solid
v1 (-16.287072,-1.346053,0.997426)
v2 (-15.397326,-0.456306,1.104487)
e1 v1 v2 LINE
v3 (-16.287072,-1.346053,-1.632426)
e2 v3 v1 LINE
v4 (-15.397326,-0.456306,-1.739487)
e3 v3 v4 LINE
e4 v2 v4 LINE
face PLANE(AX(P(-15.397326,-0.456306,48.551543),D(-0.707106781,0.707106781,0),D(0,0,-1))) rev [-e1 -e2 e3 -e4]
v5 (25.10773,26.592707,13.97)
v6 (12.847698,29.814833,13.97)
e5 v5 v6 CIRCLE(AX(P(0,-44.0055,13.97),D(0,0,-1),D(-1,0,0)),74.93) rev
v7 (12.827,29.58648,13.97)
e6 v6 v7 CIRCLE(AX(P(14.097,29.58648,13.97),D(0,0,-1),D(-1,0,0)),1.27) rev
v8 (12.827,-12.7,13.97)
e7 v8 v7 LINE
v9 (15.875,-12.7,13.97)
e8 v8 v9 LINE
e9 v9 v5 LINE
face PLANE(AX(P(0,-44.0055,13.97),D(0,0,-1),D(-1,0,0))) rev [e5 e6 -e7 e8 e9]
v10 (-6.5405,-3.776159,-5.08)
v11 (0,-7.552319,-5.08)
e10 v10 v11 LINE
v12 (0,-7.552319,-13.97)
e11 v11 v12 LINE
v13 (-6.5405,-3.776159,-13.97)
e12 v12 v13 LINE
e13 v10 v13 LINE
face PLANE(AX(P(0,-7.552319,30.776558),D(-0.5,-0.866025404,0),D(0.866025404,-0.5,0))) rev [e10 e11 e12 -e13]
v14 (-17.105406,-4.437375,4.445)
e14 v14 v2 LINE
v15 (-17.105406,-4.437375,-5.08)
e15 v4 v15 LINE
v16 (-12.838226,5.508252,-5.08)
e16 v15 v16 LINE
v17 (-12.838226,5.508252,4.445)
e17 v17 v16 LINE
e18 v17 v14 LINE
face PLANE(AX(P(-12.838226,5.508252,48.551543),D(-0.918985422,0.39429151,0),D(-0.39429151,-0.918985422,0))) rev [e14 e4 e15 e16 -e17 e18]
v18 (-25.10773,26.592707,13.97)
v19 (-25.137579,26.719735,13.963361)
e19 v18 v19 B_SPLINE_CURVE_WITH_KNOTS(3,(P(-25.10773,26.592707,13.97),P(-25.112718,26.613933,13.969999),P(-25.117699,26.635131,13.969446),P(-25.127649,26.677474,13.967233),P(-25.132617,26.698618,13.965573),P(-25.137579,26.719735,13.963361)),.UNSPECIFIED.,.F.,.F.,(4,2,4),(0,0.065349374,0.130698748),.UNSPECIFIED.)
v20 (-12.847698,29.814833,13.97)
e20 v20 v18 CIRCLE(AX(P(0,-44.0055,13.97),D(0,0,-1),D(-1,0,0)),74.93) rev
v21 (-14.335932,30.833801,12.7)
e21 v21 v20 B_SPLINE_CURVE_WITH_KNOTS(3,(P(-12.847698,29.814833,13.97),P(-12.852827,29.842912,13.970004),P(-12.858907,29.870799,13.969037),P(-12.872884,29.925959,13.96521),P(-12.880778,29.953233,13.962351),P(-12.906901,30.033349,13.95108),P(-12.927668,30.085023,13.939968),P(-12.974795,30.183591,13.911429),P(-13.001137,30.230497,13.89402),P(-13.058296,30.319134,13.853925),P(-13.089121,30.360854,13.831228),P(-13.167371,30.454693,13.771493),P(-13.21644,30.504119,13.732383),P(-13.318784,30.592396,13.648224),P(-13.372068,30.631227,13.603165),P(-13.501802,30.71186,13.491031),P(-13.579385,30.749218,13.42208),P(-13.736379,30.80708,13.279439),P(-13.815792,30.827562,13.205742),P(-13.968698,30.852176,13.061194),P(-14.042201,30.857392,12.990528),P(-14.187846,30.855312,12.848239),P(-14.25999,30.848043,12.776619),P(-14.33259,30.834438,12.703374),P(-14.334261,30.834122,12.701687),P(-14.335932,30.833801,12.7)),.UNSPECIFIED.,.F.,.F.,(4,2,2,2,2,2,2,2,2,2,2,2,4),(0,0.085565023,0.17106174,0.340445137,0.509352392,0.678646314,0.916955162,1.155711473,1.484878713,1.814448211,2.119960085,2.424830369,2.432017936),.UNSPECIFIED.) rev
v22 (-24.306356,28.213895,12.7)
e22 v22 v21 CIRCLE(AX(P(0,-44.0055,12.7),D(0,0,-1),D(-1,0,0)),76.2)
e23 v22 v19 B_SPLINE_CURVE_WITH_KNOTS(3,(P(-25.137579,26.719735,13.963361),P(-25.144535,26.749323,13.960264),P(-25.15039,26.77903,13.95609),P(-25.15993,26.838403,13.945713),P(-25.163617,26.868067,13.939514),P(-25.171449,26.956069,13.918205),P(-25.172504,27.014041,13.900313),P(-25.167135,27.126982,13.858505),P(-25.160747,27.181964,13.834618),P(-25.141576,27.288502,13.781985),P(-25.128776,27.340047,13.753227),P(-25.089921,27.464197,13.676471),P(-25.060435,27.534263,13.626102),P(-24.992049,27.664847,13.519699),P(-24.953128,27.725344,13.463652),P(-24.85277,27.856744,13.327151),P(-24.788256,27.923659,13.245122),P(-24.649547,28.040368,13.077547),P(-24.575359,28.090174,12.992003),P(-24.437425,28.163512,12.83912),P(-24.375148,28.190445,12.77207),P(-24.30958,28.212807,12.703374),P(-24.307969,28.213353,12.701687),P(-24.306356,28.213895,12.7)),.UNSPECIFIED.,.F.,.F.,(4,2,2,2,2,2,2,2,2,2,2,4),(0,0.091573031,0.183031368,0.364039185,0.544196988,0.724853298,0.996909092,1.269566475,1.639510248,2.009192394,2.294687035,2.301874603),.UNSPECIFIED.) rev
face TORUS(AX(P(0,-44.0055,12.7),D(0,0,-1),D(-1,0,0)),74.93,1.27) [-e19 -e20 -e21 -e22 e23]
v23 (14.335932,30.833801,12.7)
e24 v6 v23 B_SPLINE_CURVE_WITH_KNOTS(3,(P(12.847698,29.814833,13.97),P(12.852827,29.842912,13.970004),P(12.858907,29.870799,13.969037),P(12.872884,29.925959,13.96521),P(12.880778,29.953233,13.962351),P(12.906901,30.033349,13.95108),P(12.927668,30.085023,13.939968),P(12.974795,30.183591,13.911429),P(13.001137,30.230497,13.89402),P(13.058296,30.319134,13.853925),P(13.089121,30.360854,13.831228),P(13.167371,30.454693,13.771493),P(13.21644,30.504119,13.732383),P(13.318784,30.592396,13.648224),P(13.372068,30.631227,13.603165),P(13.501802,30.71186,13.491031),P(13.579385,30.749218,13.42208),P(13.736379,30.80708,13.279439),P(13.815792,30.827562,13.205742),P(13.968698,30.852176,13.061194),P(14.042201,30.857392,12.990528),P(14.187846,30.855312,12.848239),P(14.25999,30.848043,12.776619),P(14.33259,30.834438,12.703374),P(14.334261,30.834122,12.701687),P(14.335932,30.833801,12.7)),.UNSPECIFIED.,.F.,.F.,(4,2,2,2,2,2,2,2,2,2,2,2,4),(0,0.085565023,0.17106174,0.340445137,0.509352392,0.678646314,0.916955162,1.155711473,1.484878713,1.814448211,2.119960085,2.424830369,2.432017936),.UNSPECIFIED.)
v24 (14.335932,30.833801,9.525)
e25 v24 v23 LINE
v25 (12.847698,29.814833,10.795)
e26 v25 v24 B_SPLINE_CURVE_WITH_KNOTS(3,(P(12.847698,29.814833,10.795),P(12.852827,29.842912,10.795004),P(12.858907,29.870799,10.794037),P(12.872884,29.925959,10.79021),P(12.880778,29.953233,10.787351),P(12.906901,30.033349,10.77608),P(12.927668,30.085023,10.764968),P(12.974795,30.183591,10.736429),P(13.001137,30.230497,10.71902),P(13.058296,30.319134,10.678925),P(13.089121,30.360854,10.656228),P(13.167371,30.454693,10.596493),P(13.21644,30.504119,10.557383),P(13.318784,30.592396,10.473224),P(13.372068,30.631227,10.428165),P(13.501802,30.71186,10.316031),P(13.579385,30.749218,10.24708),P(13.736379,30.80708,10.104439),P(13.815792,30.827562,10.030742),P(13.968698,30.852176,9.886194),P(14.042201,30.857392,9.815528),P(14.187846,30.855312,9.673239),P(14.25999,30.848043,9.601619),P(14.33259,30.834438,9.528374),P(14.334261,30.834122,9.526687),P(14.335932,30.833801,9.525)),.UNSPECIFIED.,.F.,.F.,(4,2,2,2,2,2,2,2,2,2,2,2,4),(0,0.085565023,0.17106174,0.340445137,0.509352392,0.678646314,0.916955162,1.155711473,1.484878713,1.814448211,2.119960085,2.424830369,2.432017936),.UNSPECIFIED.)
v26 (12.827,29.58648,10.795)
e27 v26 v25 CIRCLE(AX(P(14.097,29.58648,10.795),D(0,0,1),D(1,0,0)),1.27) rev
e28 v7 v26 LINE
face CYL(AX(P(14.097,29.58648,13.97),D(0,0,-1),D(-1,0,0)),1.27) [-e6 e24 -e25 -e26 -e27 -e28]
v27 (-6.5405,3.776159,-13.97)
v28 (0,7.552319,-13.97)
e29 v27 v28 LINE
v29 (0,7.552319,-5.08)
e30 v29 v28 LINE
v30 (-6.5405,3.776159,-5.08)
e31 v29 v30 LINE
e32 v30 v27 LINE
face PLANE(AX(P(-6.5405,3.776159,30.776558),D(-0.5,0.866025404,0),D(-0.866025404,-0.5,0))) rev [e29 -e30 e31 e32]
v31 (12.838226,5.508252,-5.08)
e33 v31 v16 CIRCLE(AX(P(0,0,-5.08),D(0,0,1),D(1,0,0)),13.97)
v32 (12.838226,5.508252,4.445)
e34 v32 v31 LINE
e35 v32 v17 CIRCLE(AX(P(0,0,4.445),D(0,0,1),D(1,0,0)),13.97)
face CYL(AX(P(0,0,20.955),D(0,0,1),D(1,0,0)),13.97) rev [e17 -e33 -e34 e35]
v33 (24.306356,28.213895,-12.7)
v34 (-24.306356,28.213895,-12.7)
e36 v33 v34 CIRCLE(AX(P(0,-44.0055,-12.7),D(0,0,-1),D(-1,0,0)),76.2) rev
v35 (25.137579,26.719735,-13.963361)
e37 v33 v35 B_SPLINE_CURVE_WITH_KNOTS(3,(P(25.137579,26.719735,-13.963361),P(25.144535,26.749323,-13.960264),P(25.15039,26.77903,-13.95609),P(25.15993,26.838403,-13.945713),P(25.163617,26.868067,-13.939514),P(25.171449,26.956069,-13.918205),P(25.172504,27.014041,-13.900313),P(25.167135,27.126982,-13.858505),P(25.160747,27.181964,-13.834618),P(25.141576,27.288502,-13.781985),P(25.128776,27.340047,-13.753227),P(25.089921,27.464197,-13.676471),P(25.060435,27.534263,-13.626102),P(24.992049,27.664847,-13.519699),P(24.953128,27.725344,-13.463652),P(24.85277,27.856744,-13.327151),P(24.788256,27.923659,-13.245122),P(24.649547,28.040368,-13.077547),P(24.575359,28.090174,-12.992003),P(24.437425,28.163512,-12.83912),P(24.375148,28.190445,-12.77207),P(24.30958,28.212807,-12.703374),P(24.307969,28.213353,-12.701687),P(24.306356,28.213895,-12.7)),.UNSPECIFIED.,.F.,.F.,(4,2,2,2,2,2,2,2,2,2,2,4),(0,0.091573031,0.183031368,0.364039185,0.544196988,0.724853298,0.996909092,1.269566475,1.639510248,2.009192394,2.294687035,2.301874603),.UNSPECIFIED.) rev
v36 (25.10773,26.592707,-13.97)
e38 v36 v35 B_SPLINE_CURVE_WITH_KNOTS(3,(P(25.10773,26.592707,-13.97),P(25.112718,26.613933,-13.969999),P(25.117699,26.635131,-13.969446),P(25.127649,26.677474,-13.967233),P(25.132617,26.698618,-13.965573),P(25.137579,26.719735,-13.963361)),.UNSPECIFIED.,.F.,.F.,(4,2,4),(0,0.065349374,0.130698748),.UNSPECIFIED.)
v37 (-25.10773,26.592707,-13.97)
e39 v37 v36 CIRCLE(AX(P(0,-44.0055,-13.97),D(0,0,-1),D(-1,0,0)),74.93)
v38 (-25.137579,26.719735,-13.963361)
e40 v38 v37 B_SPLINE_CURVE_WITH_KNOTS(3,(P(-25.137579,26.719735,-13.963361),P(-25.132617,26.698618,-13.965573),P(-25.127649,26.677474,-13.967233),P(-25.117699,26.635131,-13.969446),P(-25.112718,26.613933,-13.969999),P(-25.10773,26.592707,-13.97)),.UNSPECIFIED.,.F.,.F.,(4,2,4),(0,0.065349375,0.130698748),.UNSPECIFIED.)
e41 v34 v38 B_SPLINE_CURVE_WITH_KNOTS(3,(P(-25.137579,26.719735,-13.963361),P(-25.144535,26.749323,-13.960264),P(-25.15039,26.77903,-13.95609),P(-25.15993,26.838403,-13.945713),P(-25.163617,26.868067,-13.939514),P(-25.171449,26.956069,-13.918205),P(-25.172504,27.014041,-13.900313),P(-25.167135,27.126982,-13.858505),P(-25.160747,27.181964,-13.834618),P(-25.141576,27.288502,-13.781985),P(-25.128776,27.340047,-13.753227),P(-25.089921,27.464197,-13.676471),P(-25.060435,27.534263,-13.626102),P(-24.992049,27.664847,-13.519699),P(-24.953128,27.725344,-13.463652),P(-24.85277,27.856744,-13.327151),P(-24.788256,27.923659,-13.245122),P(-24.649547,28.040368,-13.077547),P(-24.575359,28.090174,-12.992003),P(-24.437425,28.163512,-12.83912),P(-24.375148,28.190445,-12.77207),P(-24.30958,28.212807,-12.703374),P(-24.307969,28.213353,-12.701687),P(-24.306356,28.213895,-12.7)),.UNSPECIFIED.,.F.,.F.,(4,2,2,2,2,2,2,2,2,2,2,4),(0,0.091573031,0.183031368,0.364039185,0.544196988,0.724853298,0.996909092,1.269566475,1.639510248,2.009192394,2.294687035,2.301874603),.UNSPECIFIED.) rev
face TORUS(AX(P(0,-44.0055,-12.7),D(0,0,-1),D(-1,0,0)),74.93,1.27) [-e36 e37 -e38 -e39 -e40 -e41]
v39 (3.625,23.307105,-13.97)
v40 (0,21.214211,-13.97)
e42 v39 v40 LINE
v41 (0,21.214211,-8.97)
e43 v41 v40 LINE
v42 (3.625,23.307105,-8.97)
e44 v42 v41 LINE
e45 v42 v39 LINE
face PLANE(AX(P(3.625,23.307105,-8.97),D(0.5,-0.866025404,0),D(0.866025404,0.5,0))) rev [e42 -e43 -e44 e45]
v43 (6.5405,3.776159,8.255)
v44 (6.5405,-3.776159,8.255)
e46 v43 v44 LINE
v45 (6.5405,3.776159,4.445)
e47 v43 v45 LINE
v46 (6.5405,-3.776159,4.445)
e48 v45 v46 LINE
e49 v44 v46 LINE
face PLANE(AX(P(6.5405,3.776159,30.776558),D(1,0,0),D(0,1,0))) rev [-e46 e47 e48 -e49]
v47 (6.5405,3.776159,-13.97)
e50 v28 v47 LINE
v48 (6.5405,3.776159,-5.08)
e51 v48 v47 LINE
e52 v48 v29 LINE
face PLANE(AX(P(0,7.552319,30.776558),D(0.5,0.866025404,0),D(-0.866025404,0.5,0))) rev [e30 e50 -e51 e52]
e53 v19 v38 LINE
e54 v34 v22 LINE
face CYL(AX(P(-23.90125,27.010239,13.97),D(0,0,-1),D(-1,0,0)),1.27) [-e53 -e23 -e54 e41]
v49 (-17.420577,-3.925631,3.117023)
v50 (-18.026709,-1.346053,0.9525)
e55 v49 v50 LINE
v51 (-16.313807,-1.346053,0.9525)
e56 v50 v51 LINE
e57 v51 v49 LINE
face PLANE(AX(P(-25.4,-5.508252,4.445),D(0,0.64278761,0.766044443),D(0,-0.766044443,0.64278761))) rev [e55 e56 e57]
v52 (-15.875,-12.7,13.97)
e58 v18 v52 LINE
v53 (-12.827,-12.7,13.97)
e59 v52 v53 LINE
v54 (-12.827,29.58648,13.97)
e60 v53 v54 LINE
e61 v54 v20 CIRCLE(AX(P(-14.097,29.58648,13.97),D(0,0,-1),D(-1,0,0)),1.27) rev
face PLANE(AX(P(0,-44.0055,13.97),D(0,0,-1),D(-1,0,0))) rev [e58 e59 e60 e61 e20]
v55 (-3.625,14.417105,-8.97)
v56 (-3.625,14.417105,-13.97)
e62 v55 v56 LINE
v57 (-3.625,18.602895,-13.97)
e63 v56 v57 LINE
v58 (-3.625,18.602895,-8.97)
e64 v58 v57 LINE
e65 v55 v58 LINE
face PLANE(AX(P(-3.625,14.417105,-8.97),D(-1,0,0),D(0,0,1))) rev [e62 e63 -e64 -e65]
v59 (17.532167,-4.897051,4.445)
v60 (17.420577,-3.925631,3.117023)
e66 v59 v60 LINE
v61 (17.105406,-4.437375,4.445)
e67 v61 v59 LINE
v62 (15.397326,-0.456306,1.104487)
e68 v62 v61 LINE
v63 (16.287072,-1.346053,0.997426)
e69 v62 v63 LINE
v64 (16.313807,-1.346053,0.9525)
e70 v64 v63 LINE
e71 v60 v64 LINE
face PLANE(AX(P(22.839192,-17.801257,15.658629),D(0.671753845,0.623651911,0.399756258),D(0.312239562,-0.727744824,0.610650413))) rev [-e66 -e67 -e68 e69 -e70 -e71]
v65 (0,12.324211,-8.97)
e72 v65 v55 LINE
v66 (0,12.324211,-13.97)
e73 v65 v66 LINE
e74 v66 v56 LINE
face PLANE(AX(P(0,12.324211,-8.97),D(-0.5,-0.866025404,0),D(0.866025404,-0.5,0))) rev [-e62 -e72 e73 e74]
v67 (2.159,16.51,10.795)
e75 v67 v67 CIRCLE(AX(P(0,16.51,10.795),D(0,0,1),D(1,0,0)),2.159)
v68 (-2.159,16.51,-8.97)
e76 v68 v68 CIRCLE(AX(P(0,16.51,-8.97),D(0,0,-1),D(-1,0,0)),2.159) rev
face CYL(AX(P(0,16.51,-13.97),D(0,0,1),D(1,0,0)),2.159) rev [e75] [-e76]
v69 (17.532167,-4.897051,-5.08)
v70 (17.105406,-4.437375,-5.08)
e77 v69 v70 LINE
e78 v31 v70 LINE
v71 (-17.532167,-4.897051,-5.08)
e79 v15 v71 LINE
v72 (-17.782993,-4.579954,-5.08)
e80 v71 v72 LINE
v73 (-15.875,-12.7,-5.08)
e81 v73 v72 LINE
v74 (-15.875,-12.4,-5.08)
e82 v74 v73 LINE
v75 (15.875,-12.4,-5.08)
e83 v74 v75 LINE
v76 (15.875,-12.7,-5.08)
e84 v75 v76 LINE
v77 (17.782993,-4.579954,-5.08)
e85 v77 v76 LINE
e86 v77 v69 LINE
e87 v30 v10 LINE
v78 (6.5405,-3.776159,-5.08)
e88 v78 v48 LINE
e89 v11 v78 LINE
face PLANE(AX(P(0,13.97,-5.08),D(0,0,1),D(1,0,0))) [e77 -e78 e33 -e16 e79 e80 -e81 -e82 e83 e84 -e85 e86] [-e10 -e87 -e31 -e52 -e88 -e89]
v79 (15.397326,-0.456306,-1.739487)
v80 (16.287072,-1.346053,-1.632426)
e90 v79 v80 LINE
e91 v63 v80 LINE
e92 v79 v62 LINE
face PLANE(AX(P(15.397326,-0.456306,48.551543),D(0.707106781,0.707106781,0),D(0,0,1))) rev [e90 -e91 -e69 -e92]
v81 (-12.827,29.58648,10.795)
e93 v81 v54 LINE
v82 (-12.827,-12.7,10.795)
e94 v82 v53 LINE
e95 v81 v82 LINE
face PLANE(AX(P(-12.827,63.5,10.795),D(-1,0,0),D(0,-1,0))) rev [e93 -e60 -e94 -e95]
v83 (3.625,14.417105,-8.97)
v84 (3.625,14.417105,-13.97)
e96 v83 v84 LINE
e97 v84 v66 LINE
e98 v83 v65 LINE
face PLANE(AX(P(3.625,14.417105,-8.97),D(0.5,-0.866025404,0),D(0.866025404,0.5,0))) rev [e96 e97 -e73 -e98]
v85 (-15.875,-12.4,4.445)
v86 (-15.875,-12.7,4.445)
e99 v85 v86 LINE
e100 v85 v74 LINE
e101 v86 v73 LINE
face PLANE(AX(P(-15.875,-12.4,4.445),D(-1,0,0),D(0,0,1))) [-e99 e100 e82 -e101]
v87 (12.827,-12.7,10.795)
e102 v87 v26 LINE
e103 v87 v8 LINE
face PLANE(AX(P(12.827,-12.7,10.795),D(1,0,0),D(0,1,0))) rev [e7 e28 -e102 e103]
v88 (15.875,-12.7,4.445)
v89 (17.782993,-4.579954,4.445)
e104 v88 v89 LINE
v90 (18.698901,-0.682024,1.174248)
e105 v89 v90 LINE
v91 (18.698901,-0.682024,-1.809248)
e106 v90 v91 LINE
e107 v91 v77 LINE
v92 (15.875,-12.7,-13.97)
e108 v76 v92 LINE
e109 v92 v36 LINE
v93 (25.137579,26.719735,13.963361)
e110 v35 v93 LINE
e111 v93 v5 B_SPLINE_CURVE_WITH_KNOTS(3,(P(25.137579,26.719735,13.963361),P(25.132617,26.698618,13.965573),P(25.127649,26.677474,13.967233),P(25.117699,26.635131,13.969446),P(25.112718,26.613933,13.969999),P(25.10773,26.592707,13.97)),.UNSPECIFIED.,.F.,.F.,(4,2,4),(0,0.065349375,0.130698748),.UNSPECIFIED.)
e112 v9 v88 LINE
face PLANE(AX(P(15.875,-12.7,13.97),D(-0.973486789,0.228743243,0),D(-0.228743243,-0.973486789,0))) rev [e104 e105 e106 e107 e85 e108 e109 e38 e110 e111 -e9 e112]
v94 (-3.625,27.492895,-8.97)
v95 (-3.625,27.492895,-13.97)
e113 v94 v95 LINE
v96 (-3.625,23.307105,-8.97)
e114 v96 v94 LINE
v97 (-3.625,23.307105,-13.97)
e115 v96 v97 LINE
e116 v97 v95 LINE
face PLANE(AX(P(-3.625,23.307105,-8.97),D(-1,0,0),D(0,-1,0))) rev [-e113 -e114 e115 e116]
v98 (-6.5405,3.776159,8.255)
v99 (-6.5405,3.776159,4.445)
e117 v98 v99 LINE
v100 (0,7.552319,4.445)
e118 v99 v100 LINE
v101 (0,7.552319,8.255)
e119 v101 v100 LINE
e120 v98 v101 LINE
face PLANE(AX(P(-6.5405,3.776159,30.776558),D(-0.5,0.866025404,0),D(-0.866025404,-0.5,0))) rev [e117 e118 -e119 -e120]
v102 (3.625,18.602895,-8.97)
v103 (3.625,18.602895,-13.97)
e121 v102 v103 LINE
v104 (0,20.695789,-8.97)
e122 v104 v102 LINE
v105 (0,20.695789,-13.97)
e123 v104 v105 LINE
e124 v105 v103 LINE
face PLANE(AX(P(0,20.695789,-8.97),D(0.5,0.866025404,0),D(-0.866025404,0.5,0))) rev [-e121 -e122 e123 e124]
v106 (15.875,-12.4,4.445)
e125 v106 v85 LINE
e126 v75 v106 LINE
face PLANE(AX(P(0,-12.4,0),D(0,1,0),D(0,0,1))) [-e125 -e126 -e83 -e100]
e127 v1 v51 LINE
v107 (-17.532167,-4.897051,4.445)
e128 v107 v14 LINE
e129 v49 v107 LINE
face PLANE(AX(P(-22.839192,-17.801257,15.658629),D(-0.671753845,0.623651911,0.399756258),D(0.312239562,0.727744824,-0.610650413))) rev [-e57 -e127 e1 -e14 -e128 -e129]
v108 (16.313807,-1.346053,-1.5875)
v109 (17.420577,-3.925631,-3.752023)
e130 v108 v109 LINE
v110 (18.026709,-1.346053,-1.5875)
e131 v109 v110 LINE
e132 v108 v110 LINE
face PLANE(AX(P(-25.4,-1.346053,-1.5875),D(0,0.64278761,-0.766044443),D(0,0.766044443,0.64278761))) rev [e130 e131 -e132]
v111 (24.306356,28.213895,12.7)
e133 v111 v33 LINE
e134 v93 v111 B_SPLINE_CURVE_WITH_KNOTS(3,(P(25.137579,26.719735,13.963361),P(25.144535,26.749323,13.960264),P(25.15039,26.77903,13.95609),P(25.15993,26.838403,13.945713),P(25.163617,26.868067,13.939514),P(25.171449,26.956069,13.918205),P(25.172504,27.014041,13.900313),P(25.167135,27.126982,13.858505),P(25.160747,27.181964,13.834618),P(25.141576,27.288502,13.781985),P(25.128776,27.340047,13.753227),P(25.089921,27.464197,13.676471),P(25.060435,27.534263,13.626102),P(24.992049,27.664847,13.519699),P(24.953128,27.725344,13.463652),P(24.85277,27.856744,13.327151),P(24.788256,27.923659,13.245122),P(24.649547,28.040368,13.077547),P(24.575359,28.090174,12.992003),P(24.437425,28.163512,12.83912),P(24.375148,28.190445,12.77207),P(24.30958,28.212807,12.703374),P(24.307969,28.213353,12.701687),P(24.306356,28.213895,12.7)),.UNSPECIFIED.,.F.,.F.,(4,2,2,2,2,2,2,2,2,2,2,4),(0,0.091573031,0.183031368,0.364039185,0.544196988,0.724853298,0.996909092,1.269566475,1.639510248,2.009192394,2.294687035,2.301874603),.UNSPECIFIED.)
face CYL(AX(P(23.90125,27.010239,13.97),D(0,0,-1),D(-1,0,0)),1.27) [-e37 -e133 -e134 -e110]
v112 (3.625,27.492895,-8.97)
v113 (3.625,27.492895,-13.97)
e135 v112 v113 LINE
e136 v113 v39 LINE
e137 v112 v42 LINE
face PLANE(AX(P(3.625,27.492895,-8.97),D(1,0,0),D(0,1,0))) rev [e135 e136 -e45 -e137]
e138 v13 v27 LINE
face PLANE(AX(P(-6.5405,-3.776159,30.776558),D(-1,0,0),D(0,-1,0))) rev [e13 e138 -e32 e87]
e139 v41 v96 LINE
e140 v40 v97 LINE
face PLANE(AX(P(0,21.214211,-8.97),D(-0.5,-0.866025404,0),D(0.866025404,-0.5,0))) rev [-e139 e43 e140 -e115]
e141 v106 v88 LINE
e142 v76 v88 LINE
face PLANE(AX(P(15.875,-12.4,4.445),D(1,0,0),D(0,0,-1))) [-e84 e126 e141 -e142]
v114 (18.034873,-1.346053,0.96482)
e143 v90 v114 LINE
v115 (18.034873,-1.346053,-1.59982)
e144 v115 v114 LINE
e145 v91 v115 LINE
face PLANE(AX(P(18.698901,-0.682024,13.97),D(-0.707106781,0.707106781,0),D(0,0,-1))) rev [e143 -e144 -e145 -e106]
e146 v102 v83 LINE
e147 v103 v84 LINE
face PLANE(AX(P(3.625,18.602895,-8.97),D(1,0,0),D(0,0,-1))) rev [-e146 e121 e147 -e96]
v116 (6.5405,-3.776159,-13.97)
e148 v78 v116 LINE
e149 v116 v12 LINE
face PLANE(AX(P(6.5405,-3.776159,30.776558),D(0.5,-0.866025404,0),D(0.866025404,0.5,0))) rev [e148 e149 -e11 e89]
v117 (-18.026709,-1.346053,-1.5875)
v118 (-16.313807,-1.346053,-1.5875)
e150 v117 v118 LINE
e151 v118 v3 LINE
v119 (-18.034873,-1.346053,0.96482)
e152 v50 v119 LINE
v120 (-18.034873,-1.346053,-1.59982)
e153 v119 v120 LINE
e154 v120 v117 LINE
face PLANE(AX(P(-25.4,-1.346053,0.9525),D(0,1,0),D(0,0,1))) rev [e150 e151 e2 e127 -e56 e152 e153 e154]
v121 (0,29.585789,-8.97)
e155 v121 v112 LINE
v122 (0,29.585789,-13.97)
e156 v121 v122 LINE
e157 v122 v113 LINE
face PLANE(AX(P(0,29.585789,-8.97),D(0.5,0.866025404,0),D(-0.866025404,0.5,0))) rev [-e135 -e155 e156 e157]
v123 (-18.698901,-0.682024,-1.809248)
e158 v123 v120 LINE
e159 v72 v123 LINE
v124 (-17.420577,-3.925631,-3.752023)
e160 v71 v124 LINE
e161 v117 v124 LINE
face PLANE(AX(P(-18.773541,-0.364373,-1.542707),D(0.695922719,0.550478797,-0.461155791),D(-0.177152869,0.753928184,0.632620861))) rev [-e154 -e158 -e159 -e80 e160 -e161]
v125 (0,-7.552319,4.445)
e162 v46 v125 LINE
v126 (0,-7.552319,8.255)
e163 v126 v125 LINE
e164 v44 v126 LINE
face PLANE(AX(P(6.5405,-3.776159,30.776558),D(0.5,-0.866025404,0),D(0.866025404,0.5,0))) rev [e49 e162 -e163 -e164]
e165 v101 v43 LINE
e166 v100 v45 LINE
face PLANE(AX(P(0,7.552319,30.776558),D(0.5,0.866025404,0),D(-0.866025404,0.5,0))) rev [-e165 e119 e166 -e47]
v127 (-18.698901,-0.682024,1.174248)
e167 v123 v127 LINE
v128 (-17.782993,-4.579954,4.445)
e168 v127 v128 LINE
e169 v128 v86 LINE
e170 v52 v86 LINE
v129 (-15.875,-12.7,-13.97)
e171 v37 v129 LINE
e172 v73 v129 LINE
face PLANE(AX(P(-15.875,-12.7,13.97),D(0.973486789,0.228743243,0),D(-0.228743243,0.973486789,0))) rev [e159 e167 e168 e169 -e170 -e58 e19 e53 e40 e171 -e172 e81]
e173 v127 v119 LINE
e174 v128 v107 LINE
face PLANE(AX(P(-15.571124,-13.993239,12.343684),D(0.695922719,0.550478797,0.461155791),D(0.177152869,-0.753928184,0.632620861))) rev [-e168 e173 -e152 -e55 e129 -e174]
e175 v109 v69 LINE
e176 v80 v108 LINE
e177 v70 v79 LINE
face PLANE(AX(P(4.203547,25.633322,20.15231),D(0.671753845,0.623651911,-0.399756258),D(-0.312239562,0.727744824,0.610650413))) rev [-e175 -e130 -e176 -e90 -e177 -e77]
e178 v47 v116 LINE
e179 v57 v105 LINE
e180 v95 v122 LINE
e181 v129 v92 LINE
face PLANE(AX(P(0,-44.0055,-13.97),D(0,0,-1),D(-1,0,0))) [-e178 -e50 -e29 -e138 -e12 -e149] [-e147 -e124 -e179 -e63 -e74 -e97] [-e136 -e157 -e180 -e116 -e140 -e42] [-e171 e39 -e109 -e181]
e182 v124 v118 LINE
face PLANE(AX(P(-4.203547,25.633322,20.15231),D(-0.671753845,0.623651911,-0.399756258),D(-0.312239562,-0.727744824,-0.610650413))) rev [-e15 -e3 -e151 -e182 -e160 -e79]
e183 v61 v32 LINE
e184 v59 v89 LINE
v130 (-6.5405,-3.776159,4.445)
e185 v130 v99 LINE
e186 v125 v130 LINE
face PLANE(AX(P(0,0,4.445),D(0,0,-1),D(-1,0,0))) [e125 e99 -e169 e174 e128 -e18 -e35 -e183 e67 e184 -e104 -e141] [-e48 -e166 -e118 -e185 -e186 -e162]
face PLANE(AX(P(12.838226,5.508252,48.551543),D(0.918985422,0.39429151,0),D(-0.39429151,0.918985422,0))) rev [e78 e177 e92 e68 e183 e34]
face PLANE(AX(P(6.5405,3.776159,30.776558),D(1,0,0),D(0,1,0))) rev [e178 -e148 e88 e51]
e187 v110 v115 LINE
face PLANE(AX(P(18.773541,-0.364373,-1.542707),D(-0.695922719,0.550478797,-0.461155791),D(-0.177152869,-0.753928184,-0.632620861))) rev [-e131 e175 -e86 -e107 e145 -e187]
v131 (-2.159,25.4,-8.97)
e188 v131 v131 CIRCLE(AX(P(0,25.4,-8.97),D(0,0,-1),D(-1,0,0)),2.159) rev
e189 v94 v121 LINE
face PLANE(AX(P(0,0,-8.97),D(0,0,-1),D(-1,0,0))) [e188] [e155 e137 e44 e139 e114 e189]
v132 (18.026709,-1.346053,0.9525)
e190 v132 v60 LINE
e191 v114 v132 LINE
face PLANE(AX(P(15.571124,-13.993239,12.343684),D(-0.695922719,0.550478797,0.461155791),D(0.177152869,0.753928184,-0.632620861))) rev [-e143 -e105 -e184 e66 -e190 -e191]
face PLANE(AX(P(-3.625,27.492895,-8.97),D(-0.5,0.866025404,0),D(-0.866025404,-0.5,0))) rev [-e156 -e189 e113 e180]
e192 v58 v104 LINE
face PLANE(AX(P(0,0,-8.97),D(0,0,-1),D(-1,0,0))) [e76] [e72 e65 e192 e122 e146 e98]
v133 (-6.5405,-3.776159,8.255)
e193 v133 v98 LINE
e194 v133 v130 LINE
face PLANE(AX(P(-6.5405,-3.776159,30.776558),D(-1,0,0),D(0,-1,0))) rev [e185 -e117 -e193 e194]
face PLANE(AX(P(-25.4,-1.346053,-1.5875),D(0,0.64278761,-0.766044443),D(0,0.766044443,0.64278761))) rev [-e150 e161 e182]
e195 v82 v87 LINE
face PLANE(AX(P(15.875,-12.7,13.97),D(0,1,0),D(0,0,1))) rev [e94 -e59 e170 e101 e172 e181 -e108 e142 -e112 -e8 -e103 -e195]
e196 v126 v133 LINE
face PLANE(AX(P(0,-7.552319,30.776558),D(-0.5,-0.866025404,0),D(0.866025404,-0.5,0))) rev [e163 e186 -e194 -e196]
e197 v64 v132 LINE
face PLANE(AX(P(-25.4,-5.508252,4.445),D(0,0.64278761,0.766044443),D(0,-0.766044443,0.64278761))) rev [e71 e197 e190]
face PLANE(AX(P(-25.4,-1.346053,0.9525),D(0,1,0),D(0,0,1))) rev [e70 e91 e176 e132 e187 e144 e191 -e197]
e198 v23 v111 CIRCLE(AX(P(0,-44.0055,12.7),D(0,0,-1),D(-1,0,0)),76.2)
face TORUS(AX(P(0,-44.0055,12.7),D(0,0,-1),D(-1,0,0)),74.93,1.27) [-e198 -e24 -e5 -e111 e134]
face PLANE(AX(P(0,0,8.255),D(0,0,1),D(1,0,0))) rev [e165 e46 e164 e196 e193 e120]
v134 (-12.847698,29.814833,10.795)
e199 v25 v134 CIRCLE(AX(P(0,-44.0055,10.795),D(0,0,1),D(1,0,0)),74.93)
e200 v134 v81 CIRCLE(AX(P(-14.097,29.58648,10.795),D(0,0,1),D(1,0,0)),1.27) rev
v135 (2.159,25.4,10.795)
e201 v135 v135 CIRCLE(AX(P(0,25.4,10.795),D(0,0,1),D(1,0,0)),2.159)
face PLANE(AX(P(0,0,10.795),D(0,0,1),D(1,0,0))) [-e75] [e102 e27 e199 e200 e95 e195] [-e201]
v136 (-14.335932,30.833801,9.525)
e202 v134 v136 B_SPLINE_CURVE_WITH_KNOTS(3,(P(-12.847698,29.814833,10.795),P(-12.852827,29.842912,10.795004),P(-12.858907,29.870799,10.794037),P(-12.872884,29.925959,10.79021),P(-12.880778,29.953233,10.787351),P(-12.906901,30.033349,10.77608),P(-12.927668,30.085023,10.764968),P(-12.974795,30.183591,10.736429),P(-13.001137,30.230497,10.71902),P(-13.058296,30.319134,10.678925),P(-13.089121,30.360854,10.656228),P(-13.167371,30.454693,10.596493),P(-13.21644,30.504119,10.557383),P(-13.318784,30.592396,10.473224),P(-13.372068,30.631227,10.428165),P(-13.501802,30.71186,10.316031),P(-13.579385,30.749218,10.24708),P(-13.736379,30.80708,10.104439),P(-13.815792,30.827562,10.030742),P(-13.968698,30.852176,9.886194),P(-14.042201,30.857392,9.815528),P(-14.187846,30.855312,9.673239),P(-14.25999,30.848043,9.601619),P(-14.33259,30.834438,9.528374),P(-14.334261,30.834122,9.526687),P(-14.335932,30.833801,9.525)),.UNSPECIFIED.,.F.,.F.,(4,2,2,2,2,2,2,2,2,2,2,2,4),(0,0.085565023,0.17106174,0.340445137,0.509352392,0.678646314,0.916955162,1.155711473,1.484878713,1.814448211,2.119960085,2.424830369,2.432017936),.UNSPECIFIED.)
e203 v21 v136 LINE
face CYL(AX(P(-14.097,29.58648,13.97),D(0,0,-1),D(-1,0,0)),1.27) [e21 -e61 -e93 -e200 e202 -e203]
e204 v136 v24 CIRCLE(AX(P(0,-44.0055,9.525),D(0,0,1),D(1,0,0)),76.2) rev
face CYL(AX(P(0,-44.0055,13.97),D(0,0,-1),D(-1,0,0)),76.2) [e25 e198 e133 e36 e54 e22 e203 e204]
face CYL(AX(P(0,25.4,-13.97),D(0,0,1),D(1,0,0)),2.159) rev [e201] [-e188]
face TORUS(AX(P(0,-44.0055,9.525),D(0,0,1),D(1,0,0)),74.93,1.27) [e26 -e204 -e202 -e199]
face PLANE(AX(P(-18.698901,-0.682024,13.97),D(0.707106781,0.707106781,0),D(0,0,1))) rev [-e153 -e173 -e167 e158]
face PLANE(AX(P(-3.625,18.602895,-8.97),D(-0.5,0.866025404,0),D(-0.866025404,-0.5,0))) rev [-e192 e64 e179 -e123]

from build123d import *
from OCP.BRepFilletAPI import BRepFilletAPI_MakeChamfer

# Parameters (mm, degrees)
BOSS_EXTRUDE1_DEPTH     = 13.97
SKETCH5_W               = 25.654
SKETCH5_H               = 76.2
CUT_EXTRUDE3_DEPTH      = 3.175
CUT_EXTRUDE5_DEPTH      = 48.905647425
CUT_EXTRUDE5_DEPTH_BACK = 48.905647425
SKETCH8_R               = 2.159
SKETCH6_W               = 9.525
SKETCH6_H               = 13.97
CUT_EXTRUDE4_DEPTH      = 9.525
CUT_EXTRUDE1_DEPTH      = 22.225
CUT_EXTRUDE6_DEPTH      = 5
CUT_EXTRUDE8_DEPTH      = 44.32212749
CUT_EXTRUDE8_DEPTH_BACK = 44.32212749
CHAMFER1_SIZE           = 0.682114001
CHAMFER1_SIZE_2         = 0.508
CHAMFER1_SIZE_3         = 0.603255048
CHAMFER2_SIZE           = 0.508
CHAMFER2_SIZE2          = 0.71158035
CHAMFER2_SIZE2_2        = 0.968183523
FILLET2_R               = 1.27
SKETCH11_W              = 31.75
SKETCH11_H              = 9.525
BOSS_EXTRUDE3_DEPTH     = 0.3


with BuildPart() as part:
    # Sketch1 → Boss-Extrude1 (new, symmetric)
    with BuildSketch(Plane.XY):
        with BuildLine():
            Line((-15.875, -12.7), (-25.4, 27.836548969))
            ThreePointArc((-25.4, 27.836548969), (0, 32.1945), (25.4, 27.836548969))
            Line((25.4, 27.836548969), (15.875, -12.7))
            Line((15.875, -12.7), (-15.875, -12.7))
        make_face()
    extrude(amount=BOSS_EXTRUDE1_DEPTH, both=True)

    # Sketch5 → Cut-Extrude3 (cut)
    with BuildSketch(Plane.XY.offset(13.97)):
        with Locations((0, 25.4)):
            Rectangle(SKETCH5_W, SKETCH5_H)
    extrude(amount=-CUT_EXTRUDE3_DEPTH, mode=Mode.SUBTRACT)

    # Sketch8 → Cut-Extrude5 (cut, two sides: drawn at the far end of the back side and taken through both)
    with BuildSketch(Plane.XY.offset(10.795).offset(-CUT_EXTRUDE5_DEPTH_BACK)):
        with Locations((0, 16.51)):
            Circle(SKETCH8_R)
        with Locations((0, 25.4)):
            Circle(SKETCH8_R)
    extrude(amount=CUT_EXTRUDE5_DEPTH + CUT_EXTRUDE5_DEPTH_BACK, mode=Mode.SUBTRACT)

    # Sketch6 → Cut-Revolve2 (revolve, cut)
    with BuildSketch(Plane(origin=(0, 0, 0), x_dir=(0, 0, -1), z_dir=(1, 0, 0))):
        with Locations((0.3175, 6.985)):
            Rectangle(SKETCH6_W, SKETCH6_H)
    revolve(axis=Axis((0, 0, 20.955), (0, 0, -1)), mode=Mode.SUBTRACT)

    # Sketch7 → Cut-Extrude4 (cut)
    with BuildSketch(Plane(origin=(0, 0, -5.08), x_dir=(-1, 0, 0), z_dir=(0, 0, -1))):
        with BuildLine():
            Line((12.838226341, 5.508252391), (17.564867483, -5.508252391))
            Line((17.564867483, -5.508252391), (15.875, -12.7))
            Line((15.875, -12.7), (-15.875, -12.7))
            Line((-15.875, -12.7), (-17.564867483, -5.508252391))
            Line((-17.564867483, -5.508252391), (-12.838226341, 5.508252391))
            ThreePointArc((-12.838226341, 5.508252391), (0, 13.97), (12.838226341, 5.508252391))
        make_face()
    extrude(amount=-CUT_EXTRUDE4_DEPTH, mode=Mode.SUBTRACT)

    # Sketch3 → Cut-Extrude1 (cut)
    with BuildSketch(Plane(origin=(0, 0, -13.97), x_dir=(-1, 0, 0), z_dir=(0, 0, -1))):
        Polygon((6.5405, -3.776159436), (6.5405, 3.776159436), (0, 7.552318871), (-6.5405, 3.776159436), (-6.5405, -3.776159436), (0, -7.552318871), align=None)
    extrude(amount=-CUT_EXTRUDE1_DEPTH, mode=Mode.SUBTRACT)

    # Sketch9 → Cut-Extrude6 (cut)
    with BuildSketch(Plane(origin=(0, 0, -13.97), x_dir=(-1, 0, 0), z_dir=(0, 0, -1))):
        Polygon((3.625, 23.307105274), (3.625, 27.492894726), (0, 29.585789452), (-3.625, 27.492894726), (-3.625, 23.307105274), (0, 21.214210548), align=None)
        Polygon((3.625, 18.602894726), (0, 20.695789452), (-3.625, 18.602894726), (-3.625, 14.417105274), (0, 12.324210548), (3.625, 14.417105274), align=None)
    extrude(amount=-CUT_EXTRUDE6_DEPTH, mode=Mode.SUBTRACT)

    # Sketch10 → Cut-Extrude8 (cut, two sides: drawn at the far end of the back side and taken through both)
    with BuildSketch(Plane(origin=(0, 0, 0), x_dir=(0, 0, -1), z_dir=(1, 0, 0)).offset(-CUT_EXTRUDE8_DEPTH_BACK)):
        Polygon((-4.445, -5.508252391), (-0.9525, -1.346052969), (1.5875, -1.346052969), (5.08, -5.508252391), align=None)
    extrude(amount=CUT_EXTRUDE8_DEPTH + CUT_EXTRUDE8_DEPTH_BACK, mode=Mode.SUBTRACT)

    # Chamfer1
    # the kernel refuses this chamfer: 0.682114001, 0.603255048, 0.508 mm, written as the material it takes off along each edge
    with BuildSketch(Plane(origin=(-18.54287253, -1.346052969, -3.351137705), x_dir=(-0.24852335816266743, 0.968625903250347, 0), z_dir=(0, 0, 1))) as chamfer1_piece_1_section:
        Polygon((CHAMFER1_SIZE * 0.999792559209, -CHAMFER1_SIZE * 0.0203675757071), (-CHAMFER1_SIZE_2 * 0.248523358163, -CHAMFER1_SIZE_2 * 0.96862590325), (0, 0), align=None)
    chamfer1_piece_1 = extrude(amount=6.06727541, mode=Mode.PRIVATE)
    chamfer1_piece_1 = split(chamfer1_piece_1, bisect_by=Plane(origin=(-18.413842957, -0.601935265, 0.328111109), z_dir=(0, -0.642787609686538, -0.7660444431189792)), keep=Keep.TOP, mode=Mode.PRIVATE)
    chamfer1_piece_1 = split(chamfer1_piece_1, bisect_by=Plane(origin=(-18.413842957, -0.601935265, -0.963111109), z_dir=(0, -0.6427876096865379, 0.7660444431189793)), keep=Keep.TOP, mode=Mode.PRIVATE)
    add(chamfer1_piece_1, mode=Mode.SUBTRACT)
    with BuildSketch(Plane(origin=(18.54287253, -1.346052969, 2.716137705), x_dir=(0.2485233581626668, 0.968625903250347, 0), z_dir=(0, 0, -1))) as chamfer1_piece_2_section:
        Polygon((CHAMFER1_SIZE * 0.999792559209, -CHAMFER1_SIZE * 0.0203675757071), (-CHAMFER1_SIZE_2 * 0.248523358163, -CHAMFER1_SIZE_2 * 0.96862590325), (0, 0), align=None)
    chamfer1_piece_2 = extrude(amount=6.06727541, mode=Mode.PRIVATE)
    chamfer1_piece_2 = split(chamfer1_piece_2, bisect_by=Plane(origin=(18.413842957, -0.601935265, -0.963111109), z_dir=(0, -0.6427876096865379, 0.7660444431189793)), keep=Keep.TOP, mode=Mode.PRIVATE)
    chamfer1_piece_2 = split(chamfer1_piece_2, bisect_by=Plane(origin=(18.413842957, -0.601935265, 0.328111109), z_dir=(0, -0.642787609686538, -0.7660444431189792)), keep=Keep.TOP, mode=Mode.PRIVATE)
    add(chamfer1_piece_2, mode=Mode.SUBTRACT)
    # the kernel refuses this chamfer: 0.682114001, 0.603255048, 0.508 mm, written as the material it takes off along each edge
    with BuildSketch(Plane(origin=(-18.974731516, 0.491854947, -0.589687854), x_dir=(-0.16712797510609614, 0.6104069372998713, 0.774255520376269), z_dir=(0.1771528691217366, -0.753928184154646, 0.6326208612583173))) as chamfer1_2_piece_1_section:
        Polygon((CHAMFER1_SIZE_3 * 0.999733841967, -CHAMFER1_SIZE_3 * 0.0230704135301), (-CHAMFER1_SIZE_2 * 0.169813861997, -CHAMFER1_SIZE_2 * 0.985476155101), (0, 0), align=None)
    chamfer1_2_piece_1 = extrude(amount=9.515476986, mode=Mode.PRIVATE)
    chamfer1_2_piece_1 = split(chamfer1_2_piece_1, bisect_by=Plane(origin=(-18.030163658, -1.346052969, 0.957818648), z_dir=(0, -1, 0)), keep=Keep.TOP, mode=Mode.PRIVATE)
    chamfer1_2_piece_1 = split(chamfer1_2_piece_1, bisect_by=Plane(origin=(-18.030163658, -1.348720845, 4.445), z_dir=(0, 0, -1)), keep=Keep.TOP, mode=Mode.PRIVATE)
    add(chamfer1_2_piece_1, mode=Mode.SUBTRACT)
    with BuildSketch(Plane(origin=(-18.974731516, 0.491854947, -0.589687854), x_dir=(-0.16712797510609614, 0.6104069372998713, 0.774255520376269), z_dir=(0.1771528691217366, -0.753928184154646, 0.6326208612583173))) as chamfer1_2_piece_2_section:
        Polygon((CHAMFER1_SIZE_3 * 0.999733841967, -CHAMFER1_SIZE_3 * 0.0230704135301), (-CHAMFER1_SIZE_2 * 0.169813861997, -CHAMFER1_SIZE_2 * 0.985476155101), (0, 0), align=None)
    chamfer1_2_piece_2 = extrude(amount=9.515476986, mode=Mode.PRIVATE)
    chamfer1_2_piece_2 = split(chamfer1_2_piece_2, bisect_by=Plane(origin=(-18.378233005, -1.002692494, 1.0369902), z_dir=(-0.7071067811865488, -0.7071067811865464, 0)), keep=Keep.TOP, mode=Mode.PRIVATE)
    chamfer1_2_piece_2 = split(chamfer1_2_piece_2, bisect_by=Plane(origin=(-18.473233886, -1.097693375, 4.445), z_dir=(0, 0, -1)), keep=Keep.TOP, mode=Mode.PRIVATE)
    add(chamfer1_2_piece_2, mode=Mode.SUBTRACT)
    with BuildSketch(Plane(origin=(17.289037466, -6.682131338, 5.430001392), x_dir=(0.16712797510609612, 0.6104069372998716, 0.7742555203762688), z_dir=(0.1771528691217377, 0.7539281841546455, -0.6326208612583175))) as chamfer1_2_piece_3_section:
        Polygon((CHAMFER1_SIZE_3 * 0.999733841967, -CHAMFER1_SIZE_3 * 0.0230704135301), (-CHAMFER1_SIZE_2 * 0.169813861997, -CHAMFER1_SIZE_2 * 0.985476155101), (0, 0), align=None)
    chamfer1_2_piece_3 = extrude(amount=9.515476986, mode=Mode.PRIVATE)
    chamfer1_2_piece_3 = split(chamfer1_2_piece_3, bisect_by=Plane(origin=(17.932422067, -3.21764052, 4.445), z_dir=(0, 0, -1)), keep=Keep.TOP, mode=Mode.PRIVATE)
    chamfer1_2_piece_3 = split(chamfer1_2_piece_3, bisect_by=Plane(origin=(17.047853524, -2.333071976, 2.777240675), z_dir=(0.7071067811865496, -0.7071067811865455, 0)), keep=Keep.TOP, mode=Mode.PRIVATE)
    add(chamfer1_2_piece_3, mode=Mode.SUBTRACT)
    with BuildSketch(Plane(origin=(17.289037466, -6.682131338, 5.430001392), x_dir=(0.16712797510609612, 0.6104069372998716, 0.7742555203762688), z_dir=(0.1771528691217377, 0.7539281841546455, -0.6326208612583175))) as chamfer1_2_piece_4_section:
        Polygon((CHAMFER1_SIZE_3 * 0.999733841967, -CHAMFER1_SIZE_3 * 0.0230704135301), (-CHAMFER1_SIZE_2 * 0.169813861997, -CHAMFER1_SIZE_2 * 0.985476155101), (0, 0), align=None)
    chamfer1_2_piece_4 = extrude(amount=9.515476986, mode=Mode.PRIVATE)
    chamfer1_2_piece_4 = split(chamfer1_2_piece_4, bisect_by=Plane(origin=(18.030163658, -1.346052969, 0.957818648), z_dir=(0, -1, 0)), keep=Keep.TOP, mode=Mode.PRIVATE)
    chamfer1_2_piece_4 = split(chamfer1_2_piece_4, bisect_by=Plane(origin=(18.031184156, -1.349741343, 0.957818648), z_dir=(-0.7071067811865496, 0.7071067811865455, 0)), keep=Keep.TOP, mode=Mode.PRIVATE)
    add(chamfer1_2_piece_4, mode=Mode.SUBTRACT)
    with BuildSketch(Plane(origin=(-17.289037466, -6.682131338, -6.065001392), x_dir=(-0.16712797510609537, 0.6104069372998713, -0.7742555203762692), z_dir=(-0.17715286912173667, 0.7539281841546462, 0.6326208612583171))) as chamfer1_2_piece_5_section:
        Polygon((CHAMFER1_SIZE_3 * 0.999733841967, -CHAMFER1_SIZE_3 * 0.0230704135301), (-CHAMFER1_SIZE_2 * 0.169813861997, -CHAMFER1_SIZE_2 * 0.985476155101), (0, 0), align=None)
    chamfer1_2_piece_5 = extrude(amount=9.515476986, mode=Mode.PRIVATE)
    chamfer1_2_piece_5 = split(chamfer1_2_piece_5, bisect_by=Plane(origin=(-17.932422067, -1.346052969, -3.412240675), z_dir=(0, -1, 0)), keep=Keep.TOP, mode=Mode.PRIVATE)
    chamfer1_2_piece_5 = split(chamfer1_2_piece_5, bisect_by=Plane(origin=(-17.932422067, -3.21764052, -5.08), z_dir=(0, 0, 1)), keep=Keep.TOP, mode=Mode.PRIVATE)
    add(chamfer1_2_piece_5, mode=Mode.SUBTRACT)
    with BuildSketch(Plane(origin=(-17.289037466, -6.682131338, -6.065001392), x_dir=(-0.16712797510609537, 0.6104069372998713, -0.7742555203762692), z_dir=(-0.17715286912173667, 0.7539281841546462, 0.6326208612583171))) as chamfer1_2_piece_6_section:
        Polygon((CHAMFER1_SIZE_3 * 0.999733841967, -CHAMFER1_SIZE_3 * 0.0230704135301), (-CHAMFER1_SIZE_2 * 0.169813861997, -CHAMFER1_SIZE_2 * 0.985476155101), (0, 0), align=None)
    chamfer1_2_piece_6 = extrude(amount=9.515476986, mode=Mode.PRIVATE)
    chamfer1_2_piece_6 = split(chamfer1_2_piece_6, bisect_by=Plane(origin=(-18.378233005, -1.002692494, -1.6719902), z_dir=(-0.7071067811865488, -0.7071067811865464, 0)), keep=Keep.TOP, mode=Mode.PRIVATE)
    chamfer1_2_piece_6 = split(chamfer1_2_piece_6, bisect_by=Plane(origin=(-18.473233886, -1.097693375, -5.08), z_dir=(0, 0, 1)), keep=Keep.TOP, mode=Mode.PRIVATE)
    add(chamfer1_2_piece_6, mode=Mode.SUBTRACT)
    with BuildSketch(Plane(origin=(18.974731516, 0.491854947, -0.045312146), x_dir=(0.16712797510609612, 0.610406937299871, -0.774255520376269), z_dir=(-0.17715286912173778, -0.7539281841546458, -0.6326208612583172))) as chamfer1_2_piece_7_section:
        Polygon((CHAMFER1_SIZE_3 * 0.999733841967, -CHAMFER1_SIZE_3 * 0.0230704135301), (-CHAMFER1_SIZE_2 * 0.169813861997, -CHAMFER1_SIZE_2 * 0.985476155101), (0, 0), align=None)
    chamfer1_2_piece_7 = extrude(amount=9.515476986, mode=Mode.PRIVATE)
    chamfer1_2_piece_7 = split(chamfer1_2_piece_7, bisect_by=Plane(origin=(18.030163658, -1.346052969, -1.592818648), z_dir=(0, -1, 0)), keep=Keep.TOP, mode=Mode.PRIVATE)
    chamfer1_2_piece_7 = split(chamfer1_2_piece_7, bisect_by=Plane(origin=(18.030163658, -1.348720845, -5.08), z_dir=(0, 0, 1)), keep=Keep.TOP, mode=Mode.PRIVATE)
    add(chamfer1_2_piece_7, mode=Mode.SUBTRACT)
    with BuildSketch(Plane(origin=(18.974731516, 0.491854947, -0.045312146), x_dir=(0.16712797510609612, 0.610406937299871, -0.774255520376269), z_dir=(-0.17715286912173778, -0.7539281841546458, -0.6326208612583172))) as chamfer1_2_piece_8_section:
        Polygon((CHAMFER1_SIZE_3 * 0.999733841967, -CHAMFER1_SIZE_3 * 0.0230704135301), (-CHAMFER1_SIZE_2 * 0.169813861997, -CHAMFER1_SIZE_2 * 0.985476155101), (0, 0), align=None)
    chamfer1_2_piece_8 = extrude(amount=9.515476986, mode=Mode.PRIVATE)
    chamfer1_2_piece_8 = split(chamfer1_2_piece_8, bisect_by=Plane(origin=(18.378233005, -1.002692494, -1.6719902), z_dir=(0.7071067811865496, -0.7071067811865455, 0)), keep=Keep.TOP, mode=Mode.PRIVATE)
    chamfer1_2_piece_8 = split(chamfer1_2_piece_8, bisect_by=Plane(origin=(18.473233886, -1.097693375, -5.08), z_dir=(0, 0, 1)), keep=Keep.TOP, mode=Mode.PRIVATE)
    add(chamfer1_2_piece_8, mode=Mode.SUBTRACT)

    # Chamfer2: one chamfer whose edges measure the first distance from different faces: ONE call of the kernel's chamfer builder (chamfer() names one face for all edges)
    chamfer2_edges_1 = [part.edges().sort_by_distance(p)[0] for p in [
        (-16.505213328, -3.03848904, 2.372622483),
    ]]
    chamfer2_side_1 = [part.faces().sort_by_distance(p)[0] for p in [
        (-17.0123784, -2.474343683, 1.899248322),
    ]]
    chamfer2_edges_2 = [part.edges().sort_by_distance(p)[0] for p in [
        (-15.779072132, -1.346052969, -0.3175),
    ]]
    chamfer2_side_2 = [part.faces().sort_by_distance(p)[0] for p in [
        (-16.906992082, -1.346052969, -0.3175),
    ]]
    chamfer2_edges_3 = [part.edges().sort_by_distance(p)[0] for p in [
        (-16.505213328, -3.03848904, -3.007622483),
    ]]
    chamfer2_side_3 = [part.faces().sort_by_distance(p)[0] for p in [
        (-17.0123784, -2.474343683, -2.534248322),
    ]]
    chamfer2_edges_4 = [part.edges().sort_by_distance(p)[0] for p in [
        (16.505213328, -3.03848904, 2.372622483),
    ]]
    chamfer2_side_4 = [part.faces().sort_by_distance(p)[0] for p in [
        (17.0123784, -2.474343683, 1.899248322),
    ]]
    chamfer2_edges_5 = [part.edges().sort_by_distance(p)[0] for p in [
        (15.779072132, -1.346052969, -0.3175),
    ]]
    chamfer2_side_5 = [part.faces().sort_by_distance(p)[0] for p in [
        (16.906992082, -1.346052969, -0.3175),
    ]]
    chamfer2_edges_6 = [part.edges().sort_by_distance(p)[0] for p in [
        (16.505213328, -3.03848904, -3.007622483),
    ]]
    chamfer2_side_6 = [part.faces().sort_by_distance(p)[0] for p in [
        (17.0123784, -2.474343683, -2.534248322),
    ]]
    chamfer2 = BRepFilletAPI_MakeChamfer(part.part.solid().wrapped)
    for e in chamfer2_edges_1:
        chamfer2.Add(CHAMFER2_SIZE, CHAMFER2_SIZE2, e.wrapped, chamfer2_side_1[0].wrapped)  # the first distance lies on this face
    for e in chamfer2_edges_2:
        chamfer2.Add(CHAMFER2_SIZE, CHAMFER2_SIZE2_2, e.wrapped, chamfer2_side_2[0].wrapped)  # the first distance lies on this face
    for e in chamfer2_edges_3:
        chamfer2.Add(CHAMFER2_SIZE, CHAMFER2_SIZE2, e.wrapped, chamfer2_side_3[0].wrapped)  # the first distance lies on this face
    for e in chamfer2_edges_4:
        chamfer2.Add(CHAMFER2_SIZE, CHAMFER2_SIZE2, e.wrapped, chamfer2_side_4[0].wrapped)  # the first distance lies on this face
    for e in chamfer2_edges_5:
        chamfer2.Add(CHAMFER2_SIZE, CHAMFER2_SIZE2_2, e.wrapped, chamfer2_side_5[0].wrapped)  # the first distance lies on this face
    for e in chamfer2_edges_6:
        chamfer2.Add(CHAMFER2_SIZE, CHAMFER2_SIZE2, e.wrapped, chamfer2_side_6[0].wrapped)  # the first distance lies on this face
    add(Compound.cast(chamfer2.Shape()), mode=Mode.REPLACE)

    # Fillet2
    # the kernel refuses this fillet: 1.27 mm, written as the material it takes off along each edge
    with BuildSketch(Plane(origin=(0, -44.0055, 13.97), x_dir=(-0.37231655097771355, 0.9281058053196627, 0), z_dir=(-0.9281058053196627, -0.37231655097771355, 0))) as fillet2_piece_1:
        with BuildLine():
            CenterArc((76.2 - FILLET2_R, FILLET2_R), FILLET2_R, 270, 90)
            Line((76.2 - FILLET2_R, 0), (76.2, 0))
            Line((76.2, 0), (76.2, FILLET2_R))
        make_face()
    revolve(axis=Axis((0, -44.0055, 13.97), (0, 0, -1)), revolution_arc=14.554961915, mode=Mode.SUBTRACT)
    with BuildSketch(Plane(origin=(12.827, 31.107135894, 10.795), x_dir=(0.9839864121726662, -0.17824348700461348, 0), z_dir=(0, 0, 1))) as fillet2_piece_2:
        with BuildLine():
            CenterArc((1.520709788, -1.269935705), FILLET2_R, 89.423465076, 100.843999504)
            Line((0.271047045, -1.496304934), (0, 0))
            ThreePointArc((0, 0), (0.766744431, 0.00385769), (1.533488862, 0))
        make_face()
    extrude(amount=7.008722155, mode=Mode.SUBTRACT)
    with BuildSketch(Plane(origin=(-12.827, 31.107135894, 10.795), x_dir=(-0.983986412172668, -0.17824348700460368, 0), z_dir=(0, 0, 1))) as fillet2_piece_3:
        with BuildLine():
            CenterArc((1.520709788, 1.269935705), FILLET2_R, 169.73253542, 100.843999504)
            Line((0.271047045, 1.496304934), (0, 0))
            ThreePointArc((0, 0), (0.766744431, -0.00385769), (1.533488862, 0))
        make_face()
    extrude(amount=7.008722155, mode=Mode.SUBTRACT)
    with BuildSketch(Plane(origin=(0, -44.0055, 10.795), x_dir=(0.20924819614640747, 0.9778625631495843, 0), z_dir=(0.9778625631495843, -0.20924819614640747, 0))) as fillet2_piece_4_section:
        with BuildLine():
            CenterArc((76.2 - FILLET2_R, -FILLET2_R), FILLET2_R, 0, 90)
            Line((76.2 - FILLET2_R, 0), (76.2, 0))
            Line((76.2, 0), (76.2, -FILLET2_R))
        make_face()
    fillet2_piece_4 = revolve(axis=Axis((0, -44.0055, 10.795), (0, 0, 1)), revolution_arc=24.156596533, mode=Mode.PRIVATE)
    fillet2_piece_4 = split(fillet2_piece_4, bisect_by=Plane(origin=(-12.827, 31.838059606, 10.438559606), z_dir=(1, 0, 0)), keep=Keep.TOP, mode=Mode.PRIVATE)
    fillet2_piece_4 = split(fillet2_piece_4, bisect_by=Plane(origin=(12.827, 31.838059606, 10.438559606), z_dir=(-1, 0, 0)), keep=Keep.TOP, mode=Mode.PRIVATE)
    add(fillet2_piece_4, mode=Mode.SUBTRACT)
    with BuildSketch(Plane(origin=(0, -44.0055, 13.97), x_dir=(0.12712683029566407, 0.9918864698235265, 0), z_dir=(-0.9918864698235265, 0.12712683029566407, 0))) as fillet2_piece_5:
        with BuildLine():
            CenterArc((76.2 - FILLET2_R, FILLET2_R), FILLET2_R, 270, 90)
            Line((76.2 - FILLET2_R, 0), (76.2, 0))
            Line((76.2, 0), (76.2, FILLET2_R))
        make_face()
    revolve(axis=Axis((0, -44.0055, 13.97), (0, 0, -1)), revolution_arc=14.554961915, mode=Mode.SUBTRACT)
    with BuildSketch(Plane(origin=(0, -44.0055, -13.97), x_dir=(-0.37231927534086834, 0.9281047124164659, 0), z_dir=(-0.9281047124164659, -0.37231927534086834, 0))) as fillet2_piece_6:
        with BuildLine():
            CenterArc((76.2 - FILLET2_R, -FILLET2_R), FILLET2_R, 0, 90)
            Line((76.2, -FILLET2_R), (76.2, 0))
            Line((76.2, 0), (76.2 - FILLET2_R, 0))
        make_face()
    revolve(axis=Axis((0, -44.0055, -13.97), (0, 0, -1)), revolution_arc=43.717448578, mode=Mode.SUBTRACT)
    with BuildSketch(Plane(origin=(25.4, 27.836548969, -16.862281293), x_dir=(-0.22874324291129688, -0.9734867892387772, 0), z_dir=(0, 0, 1))) as fillet2_piece_7:
        with BuildLine():
            CenterArc((1.147231071, -1.27), FILLET2_R, 90, 84.621777916)
            ThreePointArc((-0.117177961, -1.150963031), (-0.060773335, -0.575259129), (0, 0))
            Line((0, 0), (1.147231071, 0))
        make_face()
    extrude(amount=33.724562586, mode=Mode.SUBTRACT)
    with BuildSketch(Plane(origin=(-25.4, 27.836548969, -16.862281293), x_dir=(0.22874324291129516, -0.9734867892387776, 0), z_dir=(0, 0, 1))) as fillet2_piece_8:
        with BuildLine():
            CenterArc((1.147231071, 1.27), FILLET2_R, 185.378222084, 84.621777916)
            ThreePointArc((-0.117177961, 1.150963031), (-0.060773335, 0.575259129), (0, 0))
            Line((0, 0), (1.147231071, 0))
        make_face()
    extrude(amount=33.724562586, mode=Mode.SUBTRACT)
    with BuildSketch(Plane(origin=(0, -44.0055, 10.795), x_dir=(0.20924819614640747, 0.9778625631495843, 0), z_dir=(0.9778625631495843, -0.20924819614640747, 0))) as fillet2_piece_9a_section:
        with BuildLine():
            CenterArc((76.2 - FILLET2_R, -FILLET2_R), FILLET2_R, 0, 90)
            Line((76.2 - FILLET2_R, 0), (76.2, 0))
            Line((76.2, 0), (76.2, -FILLET2_R))
        make_face()
    fillet2_piece_9a = revolve(axis=Axis((0, -44.0055, 10.795), (0, 0, 1)), revolution_arc=24.156596533, mode=Mode.PRIVATE)
    fillet2_piece_9a = split(fillet2_piece_9a, bisect_by=Plane(origin=(12.827, 30.536502101, 10.50445679), z_dir=(1, 0, 0)), keep=Keep.TOP, mode=Mode.PRIVATE)
    with BuildSketch(Plane(origin=(12.827, 31.107135894, 6.961277845), x_dir=(0.9839864121726647, -0.17824348700462206, 0), z_dir=(0, 0, 1))) as fillet2_piece_9b_section:
        with BuildLine():
            CenterArc((1.520709788, -1.269935705), FILLET2_R, 89.423465076, 100.843999504)
            Line((0.271047045, -1.496304934), (0, 0))
            ThreePointArc((0, 0), (0.766744431, 0.00385769), (1.533488862, 0))
        make_face()
    fillet2_piece_9b = extrude(amount=10.84244431, mode=Mode.PRIVATE)
    fillet2_piece_9b = split(fillet2_piece_9b, bisect_by=Plane(origin=(13.177108213, 30.693922497, 10.795), z_dir=(0, 0, -1)), keep=Keep.TOP, mode=Mode.PRIVATE)
    fillet2_piece_9 = fillet2_piece_9a & fillet2_piece_9b
    add(fillet2_piece_9, mode=Mode.SUBTRACT)
    with BuildSketch(Plane(origin=(-12.827, 31.107135894, 6.961277845), x_dir=(-0.9839864121726664, -0.17824348700461268, 0), z_dir=(0, 0, 1))) as fillet2_piece_10a_section:
        with BuildLine():
            CenterArc((1.520709788, 1.269935705), FILLET2_R, 169.73253542, 100.843999504)
            Line((0.271047045, 1.496304934), (0, 0))
            ThreePointArc((0, 0), (0.766744431, -0.00385769), (1.533488862, 0))
        make_face()
    fillet2_piece_10a = extrude(amount=10.84244431, mode=Mode.PRIVATE)
    fillet2_piece_10a = split(fillet2_piece_10a, bisect_by=Plane(origin=(-13.177108213, 30.693922497, 10.795), z_dir=(0, 0, -1)), keep=Keep.TOP, mode=Mode.PRIVATE)
    with BuildSketch(Plane(origin=(0, -44.0055, 10.795), x_dir=(0.20924819614640747, 0.9778625631495843, 0), z_dir=(0.9778625631495843, -0.20924819614640747, 0))) as fillet2_piece_10b_section:
        with BuildLine():
            CenterArc((76.2 - FILLET2_R, -FILLET2_R), FILLET2_R, 0, 90)
            Line((76.2 - FILLET2_R, 0), (76.2, 0))
            Line((76.2, 0), (76.2, -FILLET2_R))
        make_face()
    fillet2_piece_10b = revolve(axis=Axis((0, -44.0055, 10.795), (0, 0, 1)), revolution_arc=24.156596533, mode=Mode.PRIVATE)
    fillet2_piece_10b = split(fillet2_piece_10b, bisect_by=Plane(origin=(-12.827, 30.536502326, 10.504456748), z_dir=(-1, 0, 0)), keep=Keep.TOP, mode=Mode.PRIVATE)
    fillet2_piece_10 = fillet2_piece_10a & fillet2_piece_10b
    add(fillet2_piece_10, mode=Mode.SUBTRACT)

    # Sketch11 → Boss-Extrude3 (add)
    with BuildSketch(Plane.XZ.offset(12.7)):
        with Locations((0, -0.3175)):
            Rectangle(SKETCH11_W, SKETCH11_H)
    extrude(amount=-BOSS_EXTRUDE3_DEPTH)


solid = part.part
